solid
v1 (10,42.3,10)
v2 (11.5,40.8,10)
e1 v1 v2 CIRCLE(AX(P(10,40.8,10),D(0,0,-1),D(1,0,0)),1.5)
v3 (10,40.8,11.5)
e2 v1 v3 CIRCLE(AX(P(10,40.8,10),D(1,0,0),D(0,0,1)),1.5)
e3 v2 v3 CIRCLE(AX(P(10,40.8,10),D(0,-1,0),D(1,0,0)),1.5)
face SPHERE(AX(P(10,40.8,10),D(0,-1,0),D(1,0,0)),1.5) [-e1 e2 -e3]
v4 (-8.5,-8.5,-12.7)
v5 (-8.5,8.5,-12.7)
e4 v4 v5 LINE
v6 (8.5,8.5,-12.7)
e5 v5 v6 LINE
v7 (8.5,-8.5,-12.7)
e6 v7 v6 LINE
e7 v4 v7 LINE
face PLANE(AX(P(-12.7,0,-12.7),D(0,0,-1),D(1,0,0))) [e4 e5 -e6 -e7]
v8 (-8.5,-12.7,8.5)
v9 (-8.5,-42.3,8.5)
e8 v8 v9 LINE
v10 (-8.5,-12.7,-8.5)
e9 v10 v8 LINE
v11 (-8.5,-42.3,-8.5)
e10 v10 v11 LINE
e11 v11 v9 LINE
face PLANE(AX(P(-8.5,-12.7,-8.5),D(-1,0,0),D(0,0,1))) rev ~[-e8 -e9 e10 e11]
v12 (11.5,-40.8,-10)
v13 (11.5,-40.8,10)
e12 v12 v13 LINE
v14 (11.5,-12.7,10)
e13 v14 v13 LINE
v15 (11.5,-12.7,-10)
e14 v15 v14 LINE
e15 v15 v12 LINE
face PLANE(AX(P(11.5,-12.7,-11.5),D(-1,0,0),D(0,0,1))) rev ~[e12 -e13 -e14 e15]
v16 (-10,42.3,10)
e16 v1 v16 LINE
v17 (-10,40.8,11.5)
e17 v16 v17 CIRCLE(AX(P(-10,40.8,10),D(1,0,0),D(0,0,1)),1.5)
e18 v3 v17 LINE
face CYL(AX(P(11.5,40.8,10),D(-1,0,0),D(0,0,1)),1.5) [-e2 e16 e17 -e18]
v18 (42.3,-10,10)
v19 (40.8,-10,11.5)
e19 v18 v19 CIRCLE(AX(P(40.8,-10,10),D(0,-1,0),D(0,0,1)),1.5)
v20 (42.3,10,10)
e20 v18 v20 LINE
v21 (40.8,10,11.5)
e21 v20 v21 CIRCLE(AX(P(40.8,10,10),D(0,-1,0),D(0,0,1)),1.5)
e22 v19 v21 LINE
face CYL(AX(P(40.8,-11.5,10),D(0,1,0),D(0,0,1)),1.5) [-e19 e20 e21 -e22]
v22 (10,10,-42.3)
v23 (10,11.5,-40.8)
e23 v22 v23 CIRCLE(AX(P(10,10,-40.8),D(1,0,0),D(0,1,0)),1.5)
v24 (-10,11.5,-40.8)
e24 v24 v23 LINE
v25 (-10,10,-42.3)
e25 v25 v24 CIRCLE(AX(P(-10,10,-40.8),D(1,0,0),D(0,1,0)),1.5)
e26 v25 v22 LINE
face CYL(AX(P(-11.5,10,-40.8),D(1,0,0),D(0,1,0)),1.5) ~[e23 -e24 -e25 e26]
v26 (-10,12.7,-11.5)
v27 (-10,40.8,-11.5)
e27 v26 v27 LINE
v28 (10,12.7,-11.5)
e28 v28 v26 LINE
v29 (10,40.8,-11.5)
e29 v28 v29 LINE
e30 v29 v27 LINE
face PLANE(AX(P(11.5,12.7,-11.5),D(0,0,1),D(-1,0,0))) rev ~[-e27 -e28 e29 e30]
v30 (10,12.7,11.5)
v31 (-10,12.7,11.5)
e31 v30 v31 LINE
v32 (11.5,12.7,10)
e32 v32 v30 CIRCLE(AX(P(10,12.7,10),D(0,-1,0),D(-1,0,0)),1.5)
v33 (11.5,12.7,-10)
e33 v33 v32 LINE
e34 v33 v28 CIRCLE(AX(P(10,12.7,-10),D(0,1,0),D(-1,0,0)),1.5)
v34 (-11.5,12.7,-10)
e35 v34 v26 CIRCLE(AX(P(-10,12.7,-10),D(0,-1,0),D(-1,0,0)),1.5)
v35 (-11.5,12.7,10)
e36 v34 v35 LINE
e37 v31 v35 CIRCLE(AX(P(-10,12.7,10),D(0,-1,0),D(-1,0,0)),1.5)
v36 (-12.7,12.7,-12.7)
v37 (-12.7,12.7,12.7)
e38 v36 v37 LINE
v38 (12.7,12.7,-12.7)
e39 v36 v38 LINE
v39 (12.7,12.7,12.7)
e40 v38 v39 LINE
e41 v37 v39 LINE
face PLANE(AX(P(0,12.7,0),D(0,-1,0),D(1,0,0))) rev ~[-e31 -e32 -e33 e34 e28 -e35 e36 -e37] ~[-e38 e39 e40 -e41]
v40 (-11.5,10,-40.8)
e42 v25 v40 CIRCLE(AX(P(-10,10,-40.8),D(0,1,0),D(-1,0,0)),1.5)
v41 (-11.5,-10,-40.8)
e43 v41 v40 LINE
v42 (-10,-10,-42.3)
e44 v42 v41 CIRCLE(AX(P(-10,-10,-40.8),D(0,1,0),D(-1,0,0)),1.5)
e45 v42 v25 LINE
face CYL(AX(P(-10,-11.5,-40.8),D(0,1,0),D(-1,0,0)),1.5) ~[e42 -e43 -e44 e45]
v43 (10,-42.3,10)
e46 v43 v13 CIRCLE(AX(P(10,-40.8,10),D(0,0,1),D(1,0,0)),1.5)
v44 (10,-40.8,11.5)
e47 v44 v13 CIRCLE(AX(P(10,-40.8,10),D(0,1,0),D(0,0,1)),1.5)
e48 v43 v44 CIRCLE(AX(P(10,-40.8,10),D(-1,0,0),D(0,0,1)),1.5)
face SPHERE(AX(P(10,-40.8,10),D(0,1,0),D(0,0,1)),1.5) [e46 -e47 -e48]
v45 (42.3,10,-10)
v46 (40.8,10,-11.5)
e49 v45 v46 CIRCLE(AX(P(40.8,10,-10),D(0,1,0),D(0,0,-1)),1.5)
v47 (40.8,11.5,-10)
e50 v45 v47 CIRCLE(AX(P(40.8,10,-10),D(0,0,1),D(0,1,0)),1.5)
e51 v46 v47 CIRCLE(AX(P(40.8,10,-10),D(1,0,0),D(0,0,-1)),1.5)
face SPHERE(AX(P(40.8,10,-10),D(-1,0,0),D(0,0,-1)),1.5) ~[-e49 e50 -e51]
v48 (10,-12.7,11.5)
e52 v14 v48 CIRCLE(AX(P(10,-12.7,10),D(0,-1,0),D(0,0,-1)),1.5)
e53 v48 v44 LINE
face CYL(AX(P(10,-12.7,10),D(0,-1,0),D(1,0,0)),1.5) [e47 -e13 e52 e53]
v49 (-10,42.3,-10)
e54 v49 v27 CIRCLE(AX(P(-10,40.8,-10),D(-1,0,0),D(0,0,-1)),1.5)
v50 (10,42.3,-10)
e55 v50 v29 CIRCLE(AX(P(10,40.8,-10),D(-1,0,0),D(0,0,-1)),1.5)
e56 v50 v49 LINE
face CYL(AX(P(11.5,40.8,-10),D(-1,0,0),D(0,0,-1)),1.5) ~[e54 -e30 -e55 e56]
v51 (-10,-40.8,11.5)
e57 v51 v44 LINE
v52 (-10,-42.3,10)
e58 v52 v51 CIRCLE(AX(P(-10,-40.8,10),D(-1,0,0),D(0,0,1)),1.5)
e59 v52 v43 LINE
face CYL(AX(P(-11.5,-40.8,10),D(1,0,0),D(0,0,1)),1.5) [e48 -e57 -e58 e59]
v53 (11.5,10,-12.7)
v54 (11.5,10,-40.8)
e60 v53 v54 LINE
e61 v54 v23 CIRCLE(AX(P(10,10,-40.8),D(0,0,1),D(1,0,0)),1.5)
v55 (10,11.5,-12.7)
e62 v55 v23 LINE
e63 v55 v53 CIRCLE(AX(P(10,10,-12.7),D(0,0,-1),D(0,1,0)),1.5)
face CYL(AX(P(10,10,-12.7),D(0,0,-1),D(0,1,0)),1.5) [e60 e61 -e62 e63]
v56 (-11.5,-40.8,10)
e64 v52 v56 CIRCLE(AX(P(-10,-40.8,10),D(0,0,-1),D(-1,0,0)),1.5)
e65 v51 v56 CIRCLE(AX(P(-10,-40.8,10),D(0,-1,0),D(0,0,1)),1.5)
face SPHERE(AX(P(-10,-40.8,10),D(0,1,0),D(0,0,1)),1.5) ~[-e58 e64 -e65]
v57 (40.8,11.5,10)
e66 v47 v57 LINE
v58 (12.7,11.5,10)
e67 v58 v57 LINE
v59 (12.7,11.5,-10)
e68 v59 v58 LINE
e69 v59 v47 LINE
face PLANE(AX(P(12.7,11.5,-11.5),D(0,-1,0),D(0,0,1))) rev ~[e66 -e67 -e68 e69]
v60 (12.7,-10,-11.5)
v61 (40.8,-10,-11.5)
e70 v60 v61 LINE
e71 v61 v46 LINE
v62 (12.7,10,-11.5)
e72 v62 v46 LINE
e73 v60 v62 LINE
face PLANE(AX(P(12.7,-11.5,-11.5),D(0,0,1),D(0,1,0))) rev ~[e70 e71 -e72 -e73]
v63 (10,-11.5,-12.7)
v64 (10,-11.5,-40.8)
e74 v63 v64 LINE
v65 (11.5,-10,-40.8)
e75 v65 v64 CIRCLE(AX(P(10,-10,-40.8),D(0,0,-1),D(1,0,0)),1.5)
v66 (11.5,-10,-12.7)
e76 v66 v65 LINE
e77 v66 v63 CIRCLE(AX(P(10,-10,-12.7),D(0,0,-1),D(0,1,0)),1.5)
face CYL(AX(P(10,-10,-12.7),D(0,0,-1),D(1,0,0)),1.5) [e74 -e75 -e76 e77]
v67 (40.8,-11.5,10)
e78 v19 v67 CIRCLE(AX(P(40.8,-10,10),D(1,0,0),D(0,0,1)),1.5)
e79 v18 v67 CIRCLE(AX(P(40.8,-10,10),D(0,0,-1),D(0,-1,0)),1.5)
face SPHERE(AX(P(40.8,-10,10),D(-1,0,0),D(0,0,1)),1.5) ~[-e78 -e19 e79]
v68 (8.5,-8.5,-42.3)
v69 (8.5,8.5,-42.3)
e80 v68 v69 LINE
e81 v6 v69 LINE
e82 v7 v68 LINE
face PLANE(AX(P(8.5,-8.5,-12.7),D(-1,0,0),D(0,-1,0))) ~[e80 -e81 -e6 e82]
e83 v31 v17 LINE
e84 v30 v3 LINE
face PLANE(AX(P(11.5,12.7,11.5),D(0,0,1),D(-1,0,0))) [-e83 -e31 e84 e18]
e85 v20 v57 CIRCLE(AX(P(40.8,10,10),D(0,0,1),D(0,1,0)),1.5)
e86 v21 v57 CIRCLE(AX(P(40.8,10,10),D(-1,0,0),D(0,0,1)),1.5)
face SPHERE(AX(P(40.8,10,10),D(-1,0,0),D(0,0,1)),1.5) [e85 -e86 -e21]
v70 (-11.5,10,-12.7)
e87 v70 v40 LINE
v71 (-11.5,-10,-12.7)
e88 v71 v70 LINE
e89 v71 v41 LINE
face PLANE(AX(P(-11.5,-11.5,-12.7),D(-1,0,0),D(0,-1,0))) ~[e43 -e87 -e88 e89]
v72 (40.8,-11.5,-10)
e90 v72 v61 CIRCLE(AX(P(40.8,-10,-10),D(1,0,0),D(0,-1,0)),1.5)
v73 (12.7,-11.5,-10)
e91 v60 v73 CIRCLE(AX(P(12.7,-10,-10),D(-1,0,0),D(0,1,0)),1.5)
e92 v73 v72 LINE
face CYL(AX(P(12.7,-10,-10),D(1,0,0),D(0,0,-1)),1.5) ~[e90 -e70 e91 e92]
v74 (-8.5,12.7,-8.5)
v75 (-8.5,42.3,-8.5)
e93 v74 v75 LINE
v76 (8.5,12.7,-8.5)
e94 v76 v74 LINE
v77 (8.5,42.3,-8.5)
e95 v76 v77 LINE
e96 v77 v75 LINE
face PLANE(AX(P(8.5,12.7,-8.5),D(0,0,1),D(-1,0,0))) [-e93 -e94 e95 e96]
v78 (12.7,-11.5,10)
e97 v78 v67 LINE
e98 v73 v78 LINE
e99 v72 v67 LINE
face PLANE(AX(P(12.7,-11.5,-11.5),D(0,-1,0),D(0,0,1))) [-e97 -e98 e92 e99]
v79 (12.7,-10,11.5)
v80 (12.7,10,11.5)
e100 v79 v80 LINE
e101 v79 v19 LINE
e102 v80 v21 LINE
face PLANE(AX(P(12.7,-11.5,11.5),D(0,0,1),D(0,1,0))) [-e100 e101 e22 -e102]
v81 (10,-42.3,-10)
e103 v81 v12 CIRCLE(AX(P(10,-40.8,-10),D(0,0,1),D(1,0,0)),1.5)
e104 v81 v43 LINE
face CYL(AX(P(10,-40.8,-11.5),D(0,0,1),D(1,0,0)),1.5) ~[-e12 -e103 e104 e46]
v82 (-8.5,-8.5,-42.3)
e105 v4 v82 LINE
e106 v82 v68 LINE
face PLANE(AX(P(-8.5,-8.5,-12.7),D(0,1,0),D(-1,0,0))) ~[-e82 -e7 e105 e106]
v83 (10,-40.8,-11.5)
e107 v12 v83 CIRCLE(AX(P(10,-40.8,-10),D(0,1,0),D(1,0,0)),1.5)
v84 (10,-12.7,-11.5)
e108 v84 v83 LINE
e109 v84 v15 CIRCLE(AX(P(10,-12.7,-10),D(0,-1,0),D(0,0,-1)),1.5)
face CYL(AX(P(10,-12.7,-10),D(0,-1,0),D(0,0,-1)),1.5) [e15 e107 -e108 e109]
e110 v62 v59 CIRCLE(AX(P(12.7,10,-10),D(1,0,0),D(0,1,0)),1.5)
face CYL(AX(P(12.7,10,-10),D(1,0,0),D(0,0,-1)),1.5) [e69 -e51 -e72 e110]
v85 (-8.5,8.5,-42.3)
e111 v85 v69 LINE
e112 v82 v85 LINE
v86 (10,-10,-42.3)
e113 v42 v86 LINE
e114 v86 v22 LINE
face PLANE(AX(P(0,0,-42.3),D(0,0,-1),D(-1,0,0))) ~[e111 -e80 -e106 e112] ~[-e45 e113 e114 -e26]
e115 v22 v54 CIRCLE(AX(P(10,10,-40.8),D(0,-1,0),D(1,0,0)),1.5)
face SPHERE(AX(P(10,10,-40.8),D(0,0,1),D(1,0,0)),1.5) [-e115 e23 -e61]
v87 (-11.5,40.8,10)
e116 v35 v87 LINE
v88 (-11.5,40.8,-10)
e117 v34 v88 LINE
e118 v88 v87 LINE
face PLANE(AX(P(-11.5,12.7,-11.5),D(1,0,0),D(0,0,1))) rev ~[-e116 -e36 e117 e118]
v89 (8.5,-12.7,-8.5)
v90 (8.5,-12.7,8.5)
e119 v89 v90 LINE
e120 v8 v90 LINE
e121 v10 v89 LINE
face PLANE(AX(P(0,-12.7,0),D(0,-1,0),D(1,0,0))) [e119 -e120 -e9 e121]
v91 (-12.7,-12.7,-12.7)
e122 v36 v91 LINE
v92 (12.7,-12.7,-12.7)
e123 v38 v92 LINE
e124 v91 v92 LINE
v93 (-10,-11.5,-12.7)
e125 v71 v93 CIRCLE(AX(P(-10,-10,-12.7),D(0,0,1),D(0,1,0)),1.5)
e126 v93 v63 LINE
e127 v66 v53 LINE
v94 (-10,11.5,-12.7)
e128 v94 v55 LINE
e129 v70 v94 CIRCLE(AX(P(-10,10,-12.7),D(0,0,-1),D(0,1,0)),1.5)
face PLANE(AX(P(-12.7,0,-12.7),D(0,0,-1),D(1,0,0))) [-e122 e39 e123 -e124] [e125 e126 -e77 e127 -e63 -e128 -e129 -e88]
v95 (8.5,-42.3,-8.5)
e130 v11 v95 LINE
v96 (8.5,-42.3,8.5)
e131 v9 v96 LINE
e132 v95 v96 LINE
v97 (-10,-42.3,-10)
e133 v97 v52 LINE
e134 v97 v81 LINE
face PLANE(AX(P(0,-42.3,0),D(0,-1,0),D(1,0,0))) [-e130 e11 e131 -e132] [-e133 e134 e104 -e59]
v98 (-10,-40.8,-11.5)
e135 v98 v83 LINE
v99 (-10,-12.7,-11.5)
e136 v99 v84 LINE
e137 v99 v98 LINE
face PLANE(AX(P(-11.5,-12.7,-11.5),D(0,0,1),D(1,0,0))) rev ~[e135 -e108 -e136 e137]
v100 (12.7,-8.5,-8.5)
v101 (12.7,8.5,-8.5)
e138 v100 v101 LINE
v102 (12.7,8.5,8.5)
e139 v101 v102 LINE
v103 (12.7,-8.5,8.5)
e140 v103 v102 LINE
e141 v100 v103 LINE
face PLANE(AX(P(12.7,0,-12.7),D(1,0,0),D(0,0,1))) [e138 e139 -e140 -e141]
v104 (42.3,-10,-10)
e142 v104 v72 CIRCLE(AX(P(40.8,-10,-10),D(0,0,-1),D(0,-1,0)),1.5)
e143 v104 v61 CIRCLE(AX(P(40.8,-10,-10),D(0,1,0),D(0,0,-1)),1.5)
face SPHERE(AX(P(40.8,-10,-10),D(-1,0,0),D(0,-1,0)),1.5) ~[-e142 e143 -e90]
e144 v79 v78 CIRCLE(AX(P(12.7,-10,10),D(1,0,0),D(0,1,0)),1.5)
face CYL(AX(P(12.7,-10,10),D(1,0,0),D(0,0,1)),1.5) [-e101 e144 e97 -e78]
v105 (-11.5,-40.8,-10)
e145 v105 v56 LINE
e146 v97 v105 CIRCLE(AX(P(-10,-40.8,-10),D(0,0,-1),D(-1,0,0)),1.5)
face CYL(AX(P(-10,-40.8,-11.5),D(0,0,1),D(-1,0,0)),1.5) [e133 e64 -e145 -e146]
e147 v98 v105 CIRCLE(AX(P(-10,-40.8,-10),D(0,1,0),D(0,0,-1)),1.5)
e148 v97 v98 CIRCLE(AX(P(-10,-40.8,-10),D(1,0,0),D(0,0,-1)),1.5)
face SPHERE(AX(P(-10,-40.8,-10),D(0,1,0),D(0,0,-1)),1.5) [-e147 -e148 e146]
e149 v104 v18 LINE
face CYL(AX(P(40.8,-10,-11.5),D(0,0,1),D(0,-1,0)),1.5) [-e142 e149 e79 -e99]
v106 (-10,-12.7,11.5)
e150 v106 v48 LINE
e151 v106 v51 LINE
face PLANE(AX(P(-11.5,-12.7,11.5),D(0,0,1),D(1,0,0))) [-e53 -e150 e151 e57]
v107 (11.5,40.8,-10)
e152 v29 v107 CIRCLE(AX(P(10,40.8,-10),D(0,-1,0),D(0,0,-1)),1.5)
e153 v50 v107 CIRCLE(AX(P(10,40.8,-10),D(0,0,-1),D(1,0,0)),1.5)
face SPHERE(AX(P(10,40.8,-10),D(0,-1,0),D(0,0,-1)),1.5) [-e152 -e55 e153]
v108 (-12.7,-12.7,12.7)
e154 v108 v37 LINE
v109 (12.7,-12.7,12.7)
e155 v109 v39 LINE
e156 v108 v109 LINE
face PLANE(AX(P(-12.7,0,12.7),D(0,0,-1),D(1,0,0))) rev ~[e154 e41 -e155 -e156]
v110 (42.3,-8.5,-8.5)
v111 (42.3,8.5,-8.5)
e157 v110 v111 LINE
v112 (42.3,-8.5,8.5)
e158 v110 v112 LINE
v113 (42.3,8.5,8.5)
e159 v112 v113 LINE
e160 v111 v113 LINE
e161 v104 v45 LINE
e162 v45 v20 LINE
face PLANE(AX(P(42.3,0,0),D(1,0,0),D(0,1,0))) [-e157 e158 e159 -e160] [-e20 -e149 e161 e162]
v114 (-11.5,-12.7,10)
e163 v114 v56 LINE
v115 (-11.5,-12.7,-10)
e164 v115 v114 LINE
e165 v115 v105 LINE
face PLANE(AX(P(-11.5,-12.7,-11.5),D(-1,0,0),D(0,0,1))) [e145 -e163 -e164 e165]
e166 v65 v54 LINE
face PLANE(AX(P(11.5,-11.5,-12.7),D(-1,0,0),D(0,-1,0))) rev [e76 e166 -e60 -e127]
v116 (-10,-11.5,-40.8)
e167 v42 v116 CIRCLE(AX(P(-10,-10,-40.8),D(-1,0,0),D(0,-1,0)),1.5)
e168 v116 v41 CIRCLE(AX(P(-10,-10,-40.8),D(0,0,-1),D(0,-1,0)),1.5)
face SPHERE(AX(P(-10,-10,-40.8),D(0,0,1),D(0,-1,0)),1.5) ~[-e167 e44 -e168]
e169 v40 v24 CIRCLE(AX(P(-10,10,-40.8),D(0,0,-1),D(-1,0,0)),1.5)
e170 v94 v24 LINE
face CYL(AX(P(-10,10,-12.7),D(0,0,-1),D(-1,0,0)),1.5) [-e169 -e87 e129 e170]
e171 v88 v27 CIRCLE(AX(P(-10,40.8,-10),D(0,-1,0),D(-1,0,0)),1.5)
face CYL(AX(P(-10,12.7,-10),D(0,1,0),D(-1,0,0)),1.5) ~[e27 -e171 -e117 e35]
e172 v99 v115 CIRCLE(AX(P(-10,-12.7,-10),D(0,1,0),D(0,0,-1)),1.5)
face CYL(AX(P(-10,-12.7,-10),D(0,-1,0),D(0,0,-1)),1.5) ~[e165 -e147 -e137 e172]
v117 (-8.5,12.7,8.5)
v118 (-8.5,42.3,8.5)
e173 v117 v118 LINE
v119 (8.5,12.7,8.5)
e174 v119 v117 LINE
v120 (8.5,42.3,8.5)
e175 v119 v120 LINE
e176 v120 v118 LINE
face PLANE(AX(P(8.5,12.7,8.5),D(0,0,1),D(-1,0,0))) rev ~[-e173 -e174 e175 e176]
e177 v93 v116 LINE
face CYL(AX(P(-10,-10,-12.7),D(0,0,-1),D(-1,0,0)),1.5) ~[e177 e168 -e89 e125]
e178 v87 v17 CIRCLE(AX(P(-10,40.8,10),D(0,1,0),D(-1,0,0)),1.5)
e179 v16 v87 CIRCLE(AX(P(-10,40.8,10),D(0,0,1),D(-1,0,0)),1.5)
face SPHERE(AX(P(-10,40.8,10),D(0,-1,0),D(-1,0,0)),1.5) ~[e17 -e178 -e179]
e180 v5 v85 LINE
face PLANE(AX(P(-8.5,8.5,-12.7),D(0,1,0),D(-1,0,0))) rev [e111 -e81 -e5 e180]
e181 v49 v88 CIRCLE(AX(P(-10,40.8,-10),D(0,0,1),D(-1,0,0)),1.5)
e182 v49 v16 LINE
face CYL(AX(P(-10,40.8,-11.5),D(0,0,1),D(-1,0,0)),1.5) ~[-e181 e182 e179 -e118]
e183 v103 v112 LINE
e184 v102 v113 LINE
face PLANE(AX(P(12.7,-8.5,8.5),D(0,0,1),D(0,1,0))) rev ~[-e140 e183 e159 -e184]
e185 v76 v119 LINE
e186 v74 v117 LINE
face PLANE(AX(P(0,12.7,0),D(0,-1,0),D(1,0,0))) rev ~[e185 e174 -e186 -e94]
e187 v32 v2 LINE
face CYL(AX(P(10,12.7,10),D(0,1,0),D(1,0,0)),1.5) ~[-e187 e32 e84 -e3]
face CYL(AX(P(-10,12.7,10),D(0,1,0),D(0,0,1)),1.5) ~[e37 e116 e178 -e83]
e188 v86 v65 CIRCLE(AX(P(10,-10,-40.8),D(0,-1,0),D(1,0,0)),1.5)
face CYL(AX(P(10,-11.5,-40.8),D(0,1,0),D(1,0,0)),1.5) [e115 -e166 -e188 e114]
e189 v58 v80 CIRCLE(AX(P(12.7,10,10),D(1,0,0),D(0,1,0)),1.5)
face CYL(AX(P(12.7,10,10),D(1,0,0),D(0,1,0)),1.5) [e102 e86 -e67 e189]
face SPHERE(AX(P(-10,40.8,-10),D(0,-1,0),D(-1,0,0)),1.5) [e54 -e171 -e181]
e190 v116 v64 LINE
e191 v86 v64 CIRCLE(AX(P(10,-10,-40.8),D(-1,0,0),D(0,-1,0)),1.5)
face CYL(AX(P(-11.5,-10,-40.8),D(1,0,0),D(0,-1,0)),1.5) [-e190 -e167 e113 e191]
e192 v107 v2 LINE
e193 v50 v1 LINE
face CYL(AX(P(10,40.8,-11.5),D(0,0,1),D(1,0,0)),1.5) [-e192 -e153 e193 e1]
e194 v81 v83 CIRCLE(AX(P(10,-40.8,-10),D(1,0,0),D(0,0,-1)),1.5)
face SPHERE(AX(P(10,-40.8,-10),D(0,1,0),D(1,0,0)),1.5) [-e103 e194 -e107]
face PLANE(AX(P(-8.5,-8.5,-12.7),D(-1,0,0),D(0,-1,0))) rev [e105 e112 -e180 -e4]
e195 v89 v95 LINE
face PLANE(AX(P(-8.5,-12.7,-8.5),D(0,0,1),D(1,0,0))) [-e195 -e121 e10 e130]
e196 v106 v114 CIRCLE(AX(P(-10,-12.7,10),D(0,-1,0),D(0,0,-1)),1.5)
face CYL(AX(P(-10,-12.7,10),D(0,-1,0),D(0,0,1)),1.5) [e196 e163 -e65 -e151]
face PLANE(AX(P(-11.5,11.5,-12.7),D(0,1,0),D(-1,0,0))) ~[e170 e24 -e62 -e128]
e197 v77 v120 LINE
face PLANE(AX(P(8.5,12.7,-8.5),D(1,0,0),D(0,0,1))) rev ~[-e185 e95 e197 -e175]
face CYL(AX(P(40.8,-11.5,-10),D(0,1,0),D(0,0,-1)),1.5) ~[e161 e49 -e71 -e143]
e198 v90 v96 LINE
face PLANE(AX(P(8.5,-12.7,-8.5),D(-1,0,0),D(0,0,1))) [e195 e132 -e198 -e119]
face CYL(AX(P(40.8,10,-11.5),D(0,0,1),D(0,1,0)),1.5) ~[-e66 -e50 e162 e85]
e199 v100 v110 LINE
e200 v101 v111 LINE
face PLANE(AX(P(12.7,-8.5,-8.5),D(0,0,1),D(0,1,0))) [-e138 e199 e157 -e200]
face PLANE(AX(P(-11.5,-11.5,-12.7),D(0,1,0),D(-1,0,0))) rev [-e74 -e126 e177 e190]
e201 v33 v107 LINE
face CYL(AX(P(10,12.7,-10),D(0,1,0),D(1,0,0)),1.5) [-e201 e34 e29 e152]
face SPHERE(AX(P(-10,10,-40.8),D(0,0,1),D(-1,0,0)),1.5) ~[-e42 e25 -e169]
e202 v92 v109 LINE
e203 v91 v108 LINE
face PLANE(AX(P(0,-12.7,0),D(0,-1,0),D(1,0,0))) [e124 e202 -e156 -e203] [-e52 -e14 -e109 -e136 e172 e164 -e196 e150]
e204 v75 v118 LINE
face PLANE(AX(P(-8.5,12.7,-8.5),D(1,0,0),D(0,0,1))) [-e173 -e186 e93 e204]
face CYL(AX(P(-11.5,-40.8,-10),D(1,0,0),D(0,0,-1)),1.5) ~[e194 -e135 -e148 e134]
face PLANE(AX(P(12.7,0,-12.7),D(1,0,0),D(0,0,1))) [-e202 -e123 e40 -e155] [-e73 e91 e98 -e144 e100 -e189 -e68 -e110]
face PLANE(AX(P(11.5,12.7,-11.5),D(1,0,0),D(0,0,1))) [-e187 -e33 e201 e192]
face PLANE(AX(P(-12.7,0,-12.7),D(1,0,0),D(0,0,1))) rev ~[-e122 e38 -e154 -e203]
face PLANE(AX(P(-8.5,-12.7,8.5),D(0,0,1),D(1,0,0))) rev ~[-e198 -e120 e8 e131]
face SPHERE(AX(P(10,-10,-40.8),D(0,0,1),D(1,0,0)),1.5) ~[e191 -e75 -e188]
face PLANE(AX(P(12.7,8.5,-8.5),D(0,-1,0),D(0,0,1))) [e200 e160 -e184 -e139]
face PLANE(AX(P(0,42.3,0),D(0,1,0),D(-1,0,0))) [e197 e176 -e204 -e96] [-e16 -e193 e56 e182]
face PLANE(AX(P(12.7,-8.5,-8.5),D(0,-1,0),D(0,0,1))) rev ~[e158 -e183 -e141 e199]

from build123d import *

# Parameters (mm, degrees)
F0_W            = 25.4
F0_H            = 25.4
F1_DEPTH        = 12.7
F2_W            = 23
F2_H            = 23
F2_W_2          = 17
F2_H_2          = 17
F3_DEPTH        = 29.6
F3_COPIES_COUNT = 3
F3_COPIES_ANGLE = 180
F4_R            = 1.5


# Not quite as in the source:
# - a pattern or mirror of a feature is missing from the dataset's text; its kind, count and spacing are read off the source's solid


with BuildPart() as f1:
    # F0 (on Front) → F1 (new body, symmetric)
    with BuildSketch(Plane.XZ):
        Rectangle(F0_W, F0_H)
    extrude(amount=F1_DEPTH, both=True)

    # F2 (on face) → F3 (join)
    with BuildSketch(Plane.XZ.offset(12.7)):
        Rectangle(F2_W, F2_H)
        Rectangle(F2_W_2, F2_H_2, mode=Mode.SUBTRACT)
    f3 = extrude(amount=F3_DEPTH)

    # F3_copies: F3 ×3 about axis
    f3_copies_axis = Axis((0, 0, 0), (0, 0, 1))
    for i in range(1, F3_COPIES_COUNT):
        add(f3.rotate(f3_copies_axis, i * F3_COPIES_ANGLE / (F3_COPIES_COUNT - 1)))

    # F3_copies1: F3 across plane
    add(f3.mirror(Plane(origin=(0, 0, 0), x_dir=(0, -0.7071067812, -0.7071067812), z_dir=(0, 0.7071067812, -0.7071067812))))

    # F4
    f4_edges = [f1.edges().sort_by_distance(p)[0] for p in [
        (11.5, -27.5, 11.5),
        (11.5, -27.5, -11.5),
        (-11.5, -27.5, 11.5),
        (-11.5, -27.5, -11.5),
        (0, -42.3, 11.5),
        (11.5, -42.3, 0),
        (0, -42.3, -11.5),
        (-11.5, -42.3, 0),
        (-11.5, 27.5, -11.5),
        (-11.5, 27.5, 11.5),
        (-11.5, 42.3, 0),
        (11.5, 27.5, -11.5),
        (0, 42.3, -11.5),
        (11.5, 27.5, 11.5),
        (11.5, 42.3, 0),
        (0, 42.3, 11.5),
        (27.5, 11.5, 11.5),
        (27.5, -11.5, 11.5),
        (42.3, 0, 11.5),
        (27.5, -11.5, -11.5),
        (42.3, -11.5, 0),
        (27.5, 11.5, -11.5),
        (42.3, 0, -11.5),
        (42.3, 11.5, 0),
        (11.5, -11.5, -27.5),
        (11.5, 11.5, -27.5),
        (11.5, 0, -42.3),
        (-11.5, -11.5, -27.5),
        (0, -11.5, -42.3),
        (-11.5, 11.5, -27.5),
        (-11.5, 0, -42.3),
        (0, 11.5, -42.3),
    ]]
    fillet(f4_edges, radius=F4_R)


solid = f1.part
